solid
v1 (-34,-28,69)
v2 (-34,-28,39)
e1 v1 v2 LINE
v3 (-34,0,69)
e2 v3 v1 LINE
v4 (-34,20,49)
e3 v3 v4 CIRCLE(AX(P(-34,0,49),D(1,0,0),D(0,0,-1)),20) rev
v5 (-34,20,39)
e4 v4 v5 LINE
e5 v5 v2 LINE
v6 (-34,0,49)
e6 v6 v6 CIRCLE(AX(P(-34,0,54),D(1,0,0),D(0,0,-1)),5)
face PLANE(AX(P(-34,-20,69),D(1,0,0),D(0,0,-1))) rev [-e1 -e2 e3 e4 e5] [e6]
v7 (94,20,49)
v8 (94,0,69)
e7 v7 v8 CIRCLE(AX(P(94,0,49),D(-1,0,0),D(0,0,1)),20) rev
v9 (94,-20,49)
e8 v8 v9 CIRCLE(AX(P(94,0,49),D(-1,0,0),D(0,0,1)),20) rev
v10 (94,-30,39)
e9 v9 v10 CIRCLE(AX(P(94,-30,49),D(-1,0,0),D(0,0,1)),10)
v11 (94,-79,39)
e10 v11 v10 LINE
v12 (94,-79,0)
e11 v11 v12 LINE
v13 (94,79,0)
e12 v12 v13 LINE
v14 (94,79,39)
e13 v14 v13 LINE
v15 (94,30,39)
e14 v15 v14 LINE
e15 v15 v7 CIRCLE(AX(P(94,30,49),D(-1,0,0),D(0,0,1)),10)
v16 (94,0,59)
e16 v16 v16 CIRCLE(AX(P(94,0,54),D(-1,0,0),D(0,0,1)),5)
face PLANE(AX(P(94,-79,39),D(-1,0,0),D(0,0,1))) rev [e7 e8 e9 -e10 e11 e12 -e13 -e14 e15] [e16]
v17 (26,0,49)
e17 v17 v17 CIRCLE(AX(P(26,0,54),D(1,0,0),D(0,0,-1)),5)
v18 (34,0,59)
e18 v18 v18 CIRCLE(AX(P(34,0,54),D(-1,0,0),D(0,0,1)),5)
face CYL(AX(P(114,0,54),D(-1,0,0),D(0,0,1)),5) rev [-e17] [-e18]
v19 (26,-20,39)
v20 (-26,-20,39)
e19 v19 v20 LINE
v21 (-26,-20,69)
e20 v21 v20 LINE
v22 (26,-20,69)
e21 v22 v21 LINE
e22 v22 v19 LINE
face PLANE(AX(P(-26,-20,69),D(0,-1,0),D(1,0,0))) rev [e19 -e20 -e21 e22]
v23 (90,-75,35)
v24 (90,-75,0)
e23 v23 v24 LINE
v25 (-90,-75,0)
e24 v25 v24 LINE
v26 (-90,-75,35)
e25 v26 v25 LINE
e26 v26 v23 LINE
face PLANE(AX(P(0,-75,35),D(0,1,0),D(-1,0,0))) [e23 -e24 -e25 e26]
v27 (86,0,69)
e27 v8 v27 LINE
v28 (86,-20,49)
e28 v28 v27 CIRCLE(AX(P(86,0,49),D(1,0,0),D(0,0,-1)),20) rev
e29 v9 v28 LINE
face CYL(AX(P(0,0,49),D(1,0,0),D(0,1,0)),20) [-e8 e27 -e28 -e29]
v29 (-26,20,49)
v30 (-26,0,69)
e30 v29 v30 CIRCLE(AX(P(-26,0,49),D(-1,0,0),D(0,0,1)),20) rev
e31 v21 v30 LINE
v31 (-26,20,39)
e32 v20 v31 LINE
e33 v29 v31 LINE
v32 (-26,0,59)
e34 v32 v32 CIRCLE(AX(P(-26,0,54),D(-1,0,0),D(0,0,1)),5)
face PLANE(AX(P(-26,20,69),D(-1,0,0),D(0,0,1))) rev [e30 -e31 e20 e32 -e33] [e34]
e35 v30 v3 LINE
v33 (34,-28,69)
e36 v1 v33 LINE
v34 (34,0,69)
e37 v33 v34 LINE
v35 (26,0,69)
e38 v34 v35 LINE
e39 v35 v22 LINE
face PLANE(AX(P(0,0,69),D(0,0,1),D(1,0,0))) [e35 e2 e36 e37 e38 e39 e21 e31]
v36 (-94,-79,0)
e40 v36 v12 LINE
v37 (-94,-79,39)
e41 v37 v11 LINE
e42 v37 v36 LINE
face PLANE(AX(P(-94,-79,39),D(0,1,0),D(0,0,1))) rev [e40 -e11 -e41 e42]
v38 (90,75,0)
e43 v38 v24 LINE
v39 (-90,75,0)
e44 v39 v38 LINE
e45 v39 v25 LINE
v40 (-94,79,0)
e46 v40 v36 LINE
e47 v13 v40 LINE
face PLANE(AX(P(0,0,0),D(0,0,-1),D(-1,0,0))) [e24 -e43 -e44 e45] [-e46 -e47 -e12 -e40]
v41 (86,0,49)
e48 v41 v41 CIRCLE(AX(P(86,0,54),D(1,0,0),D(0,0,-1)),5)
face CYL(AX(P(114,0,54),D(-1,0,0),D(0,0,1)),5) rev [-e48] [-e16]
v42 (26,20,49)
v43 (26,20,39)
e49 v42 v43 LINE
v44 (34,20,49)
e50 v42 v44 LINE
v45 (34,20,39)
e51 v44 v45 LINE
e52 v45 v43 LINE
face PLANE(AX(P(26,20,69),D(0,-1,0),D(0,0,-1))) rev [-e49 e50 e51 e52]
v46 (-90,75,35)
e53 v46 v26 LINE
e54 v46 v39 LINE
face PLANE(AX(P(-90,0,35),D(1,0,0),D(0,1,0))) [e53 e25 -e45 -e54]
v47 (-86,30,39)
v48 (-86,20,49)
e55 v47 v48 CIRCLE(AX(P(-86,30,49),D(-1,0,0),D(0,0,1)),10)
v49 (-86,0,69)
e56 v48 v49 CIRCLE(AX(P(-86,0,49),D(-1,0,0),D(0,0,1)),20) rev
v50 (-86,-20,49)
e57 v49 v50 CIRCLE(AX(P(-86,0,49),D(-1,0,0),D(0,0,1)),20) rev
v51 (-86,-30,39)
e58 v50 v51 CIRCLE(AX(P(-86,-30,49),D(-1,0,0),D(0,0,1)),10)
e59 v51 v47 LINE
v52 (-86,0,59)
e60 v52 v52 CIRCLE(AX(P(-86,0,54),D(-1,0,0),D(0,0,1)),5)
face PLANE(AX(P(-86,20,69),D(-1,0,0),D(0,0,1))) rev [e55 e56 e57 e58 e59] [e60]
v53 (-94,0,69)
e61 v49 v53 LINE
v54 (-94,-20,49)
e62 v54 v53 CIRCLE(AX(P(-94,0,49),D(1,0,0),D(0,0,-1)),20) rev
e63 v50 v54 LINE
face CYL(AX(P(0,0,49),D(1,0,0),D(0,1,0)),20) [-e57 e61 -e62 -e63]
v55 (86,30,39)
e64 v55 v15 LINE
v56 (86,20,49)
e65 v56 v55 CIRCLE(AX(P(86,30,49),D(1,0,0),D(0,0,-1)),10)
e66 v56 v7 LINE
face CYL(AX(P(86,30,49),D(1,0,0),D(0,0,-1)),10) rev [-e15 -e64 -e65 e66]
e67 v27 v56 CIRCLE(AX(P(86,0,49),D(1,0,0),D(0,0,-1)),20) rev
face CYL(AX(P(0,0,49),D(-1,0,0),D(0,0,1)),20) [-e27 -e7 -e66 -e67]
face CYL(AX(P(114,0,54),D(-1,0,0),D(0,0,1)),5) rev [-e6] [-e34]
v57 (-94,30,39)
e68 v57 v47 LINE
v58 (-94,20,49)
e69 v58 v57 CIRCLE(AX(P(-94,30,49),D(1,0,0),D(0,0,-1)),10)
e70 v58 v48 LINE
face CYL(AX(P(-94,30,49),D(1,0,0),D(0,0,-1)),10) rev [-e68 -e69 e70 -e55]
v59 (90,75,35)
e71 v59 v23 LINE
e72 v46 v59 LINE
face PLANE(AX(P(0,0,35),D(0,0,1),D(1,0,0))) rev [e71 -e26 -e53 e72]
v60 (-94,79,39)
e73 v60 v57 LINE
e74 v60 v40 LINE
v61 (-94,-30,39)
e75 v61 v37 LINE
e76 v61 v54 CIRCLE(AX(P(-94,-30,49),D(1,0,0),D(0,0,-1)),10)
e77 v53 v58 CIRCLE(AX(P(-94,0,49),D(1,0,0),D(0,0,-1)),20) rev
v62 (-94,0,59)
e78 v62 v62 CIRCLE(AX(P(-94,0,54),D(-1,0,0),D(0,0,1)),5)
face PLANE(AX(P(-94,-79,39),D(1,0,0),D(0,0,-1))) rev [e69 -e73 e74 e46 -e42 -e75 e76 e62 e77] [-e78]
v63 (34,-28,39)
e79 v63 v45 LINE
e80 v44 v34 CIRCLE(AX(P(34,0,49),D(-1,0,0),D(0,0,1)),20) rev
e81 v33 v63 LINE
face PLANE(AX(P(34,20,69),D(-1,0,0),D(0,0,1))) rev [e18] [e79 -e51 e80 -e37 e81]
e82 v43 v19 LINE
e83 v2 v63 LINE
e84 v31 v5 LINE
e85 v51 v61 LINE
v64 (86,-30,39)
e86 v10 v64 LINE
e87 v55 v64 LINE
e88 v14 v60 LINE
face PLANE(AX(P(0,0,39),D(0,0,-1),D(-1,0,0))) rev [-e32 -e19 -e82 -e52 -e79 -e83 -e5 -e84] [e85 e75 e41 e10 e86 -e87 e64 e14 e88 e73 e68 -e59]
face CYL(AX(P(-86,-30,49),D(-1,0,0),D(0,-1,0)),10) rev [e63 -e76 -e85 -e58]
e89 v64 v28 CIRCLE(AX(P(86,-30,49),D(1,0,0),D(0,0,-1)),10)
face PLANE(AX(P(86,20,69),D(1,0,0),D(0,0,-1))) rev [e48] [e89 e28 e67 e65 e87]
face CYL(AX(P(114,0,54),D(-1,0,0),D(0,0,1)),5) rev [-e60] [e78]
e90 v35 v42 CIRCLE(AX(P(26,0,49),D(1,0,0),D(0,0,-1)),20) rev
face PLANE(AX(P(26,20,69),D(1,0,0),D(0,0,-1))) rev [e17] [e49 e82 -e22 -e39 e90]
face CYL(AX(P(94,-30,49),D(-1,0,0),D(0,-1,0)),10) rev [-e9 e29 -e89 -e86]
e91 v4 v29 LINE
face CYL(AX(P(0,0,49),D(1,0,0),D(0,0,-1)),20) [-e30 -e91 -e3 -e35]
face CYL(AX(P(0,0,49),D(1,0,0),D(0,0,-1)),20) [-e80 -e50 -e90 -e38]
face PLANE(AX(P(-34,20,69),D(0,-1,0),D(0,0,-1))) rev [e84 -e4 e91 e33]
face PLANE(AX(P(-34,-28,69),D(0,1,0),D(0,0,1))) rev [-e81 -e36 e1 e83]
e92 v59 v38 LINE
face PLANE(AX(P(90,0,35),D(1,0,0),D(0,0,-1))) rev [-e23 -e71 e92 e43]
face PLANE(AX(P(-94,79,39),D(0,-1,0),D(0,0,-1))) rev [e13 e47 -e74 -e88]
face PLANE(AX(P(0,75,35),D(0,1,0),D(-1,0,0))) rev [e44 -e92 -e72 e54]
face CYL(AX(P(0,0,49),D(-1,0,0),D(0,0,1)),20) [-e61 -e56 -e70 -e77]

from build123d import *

# Parameters (mm, degrees)
SKIZZE1_W                       = 188
SKIZZE1_H                       = 158
AUFSATZ_LINEAR_AUSTRAGEN1_DEPTH = 39
SKIZZE2_W                       = 180
SKIZZE2_H                       = 150
SCHNITT_LINEAR_AUSTRAGEN1_DEPTH = 35
SKIZZE3_W                       = 8
SKIZZE3_H                       = 40
AUFSATZ_LINEAR_AUSTRAGEN2_DEPTH = 30
VERRUNDUNG1_R                   = 20
SKIZZE4_R                       = 5
SCHNITT_LINEAR_AUSTRAGEN2_DEPTH = 208
VERRUNDUNG2_R                   = 10


with BuildPart() as part:
    # Skizze1 → Aufsatz-Linear austragen1 (new body)
    with BuildSketch(Plane.XY):
        Rectangle(SKIZZE1_W, SKIZZE1_H)
    extrude(amount=AUFSATZ_LINEAR_AUSTRAGEN1_DEPTH)

    # Skizze2 → Schnitt-Linear austragen1 (cut)
    with BuildSketch(Plane.XY):
        Rectangle(SKIZZE2_W, SKIZZE2_H)
    extrude(amount=SCHNITT_LINEAR_AUSTRAGEN1_DEPTH, mode=Mode.SUBTRACT)

    # Skizze3 → Aufsatz-Linear austragen2 (add)
    with BuildSketch(Plane.XY.offset(39)):
        with Locations((-90, 0)):
            Rectangle(SKIZZE3_W, SKIZZE3_H)
        Polygon((-34, 20), (-26, 20), (-26, -20), (26, -20), (26, 20), (34, 20), (34, -20), (34, -28), (-34, -28), (-34, -20), align=None)
        with Locations((90, 0)):
            Rectangle(SKIZZE3_W, SKIZZE3_H)
    extrude(amount=AUFSATZ_LINEAR_AUSTRAGEN2_DEPTH)

    # Verrundung1
    verrundung1_edges = [part.edges().sort_by_distance(p)[0] for p in [
        (-90, -20, 69),
        (-90, 20, 69),
        (30, 20, 69),
        (-30, 20, 69),
        (90, -20, 69),
        (90, 20, 69),
    ]]
    fillet(verrundung1_edges, radius=VERRUNDUNG1_R - 0.0001)  # a hair under: the kernel refuses the full size

    # Skizze4 → Schnitt-Linear austragen2 (cut)
    with BuildSketch(Plane.ZY.offset(94)):
        with Locations((54, 0)):
            Circle(SKIZZE4_R)
    extrude(amount=-SCHNITT_LINEAR_AUSTRAGEN2_DEPTH, mode=Mode.SUBTRACT)

    # Verrundung2
    verrundung2_edges = [part.edges().sort_by_distance(p)[0] for p in [
        (-90, 20, 39),
        (-90, -20, 39),
        (90, 20, 39),
        (90, -20, 39),
    ]]
    fillet(verrundung2_edges, radius=VERRUNDUNG2_R)


solid = part.part
